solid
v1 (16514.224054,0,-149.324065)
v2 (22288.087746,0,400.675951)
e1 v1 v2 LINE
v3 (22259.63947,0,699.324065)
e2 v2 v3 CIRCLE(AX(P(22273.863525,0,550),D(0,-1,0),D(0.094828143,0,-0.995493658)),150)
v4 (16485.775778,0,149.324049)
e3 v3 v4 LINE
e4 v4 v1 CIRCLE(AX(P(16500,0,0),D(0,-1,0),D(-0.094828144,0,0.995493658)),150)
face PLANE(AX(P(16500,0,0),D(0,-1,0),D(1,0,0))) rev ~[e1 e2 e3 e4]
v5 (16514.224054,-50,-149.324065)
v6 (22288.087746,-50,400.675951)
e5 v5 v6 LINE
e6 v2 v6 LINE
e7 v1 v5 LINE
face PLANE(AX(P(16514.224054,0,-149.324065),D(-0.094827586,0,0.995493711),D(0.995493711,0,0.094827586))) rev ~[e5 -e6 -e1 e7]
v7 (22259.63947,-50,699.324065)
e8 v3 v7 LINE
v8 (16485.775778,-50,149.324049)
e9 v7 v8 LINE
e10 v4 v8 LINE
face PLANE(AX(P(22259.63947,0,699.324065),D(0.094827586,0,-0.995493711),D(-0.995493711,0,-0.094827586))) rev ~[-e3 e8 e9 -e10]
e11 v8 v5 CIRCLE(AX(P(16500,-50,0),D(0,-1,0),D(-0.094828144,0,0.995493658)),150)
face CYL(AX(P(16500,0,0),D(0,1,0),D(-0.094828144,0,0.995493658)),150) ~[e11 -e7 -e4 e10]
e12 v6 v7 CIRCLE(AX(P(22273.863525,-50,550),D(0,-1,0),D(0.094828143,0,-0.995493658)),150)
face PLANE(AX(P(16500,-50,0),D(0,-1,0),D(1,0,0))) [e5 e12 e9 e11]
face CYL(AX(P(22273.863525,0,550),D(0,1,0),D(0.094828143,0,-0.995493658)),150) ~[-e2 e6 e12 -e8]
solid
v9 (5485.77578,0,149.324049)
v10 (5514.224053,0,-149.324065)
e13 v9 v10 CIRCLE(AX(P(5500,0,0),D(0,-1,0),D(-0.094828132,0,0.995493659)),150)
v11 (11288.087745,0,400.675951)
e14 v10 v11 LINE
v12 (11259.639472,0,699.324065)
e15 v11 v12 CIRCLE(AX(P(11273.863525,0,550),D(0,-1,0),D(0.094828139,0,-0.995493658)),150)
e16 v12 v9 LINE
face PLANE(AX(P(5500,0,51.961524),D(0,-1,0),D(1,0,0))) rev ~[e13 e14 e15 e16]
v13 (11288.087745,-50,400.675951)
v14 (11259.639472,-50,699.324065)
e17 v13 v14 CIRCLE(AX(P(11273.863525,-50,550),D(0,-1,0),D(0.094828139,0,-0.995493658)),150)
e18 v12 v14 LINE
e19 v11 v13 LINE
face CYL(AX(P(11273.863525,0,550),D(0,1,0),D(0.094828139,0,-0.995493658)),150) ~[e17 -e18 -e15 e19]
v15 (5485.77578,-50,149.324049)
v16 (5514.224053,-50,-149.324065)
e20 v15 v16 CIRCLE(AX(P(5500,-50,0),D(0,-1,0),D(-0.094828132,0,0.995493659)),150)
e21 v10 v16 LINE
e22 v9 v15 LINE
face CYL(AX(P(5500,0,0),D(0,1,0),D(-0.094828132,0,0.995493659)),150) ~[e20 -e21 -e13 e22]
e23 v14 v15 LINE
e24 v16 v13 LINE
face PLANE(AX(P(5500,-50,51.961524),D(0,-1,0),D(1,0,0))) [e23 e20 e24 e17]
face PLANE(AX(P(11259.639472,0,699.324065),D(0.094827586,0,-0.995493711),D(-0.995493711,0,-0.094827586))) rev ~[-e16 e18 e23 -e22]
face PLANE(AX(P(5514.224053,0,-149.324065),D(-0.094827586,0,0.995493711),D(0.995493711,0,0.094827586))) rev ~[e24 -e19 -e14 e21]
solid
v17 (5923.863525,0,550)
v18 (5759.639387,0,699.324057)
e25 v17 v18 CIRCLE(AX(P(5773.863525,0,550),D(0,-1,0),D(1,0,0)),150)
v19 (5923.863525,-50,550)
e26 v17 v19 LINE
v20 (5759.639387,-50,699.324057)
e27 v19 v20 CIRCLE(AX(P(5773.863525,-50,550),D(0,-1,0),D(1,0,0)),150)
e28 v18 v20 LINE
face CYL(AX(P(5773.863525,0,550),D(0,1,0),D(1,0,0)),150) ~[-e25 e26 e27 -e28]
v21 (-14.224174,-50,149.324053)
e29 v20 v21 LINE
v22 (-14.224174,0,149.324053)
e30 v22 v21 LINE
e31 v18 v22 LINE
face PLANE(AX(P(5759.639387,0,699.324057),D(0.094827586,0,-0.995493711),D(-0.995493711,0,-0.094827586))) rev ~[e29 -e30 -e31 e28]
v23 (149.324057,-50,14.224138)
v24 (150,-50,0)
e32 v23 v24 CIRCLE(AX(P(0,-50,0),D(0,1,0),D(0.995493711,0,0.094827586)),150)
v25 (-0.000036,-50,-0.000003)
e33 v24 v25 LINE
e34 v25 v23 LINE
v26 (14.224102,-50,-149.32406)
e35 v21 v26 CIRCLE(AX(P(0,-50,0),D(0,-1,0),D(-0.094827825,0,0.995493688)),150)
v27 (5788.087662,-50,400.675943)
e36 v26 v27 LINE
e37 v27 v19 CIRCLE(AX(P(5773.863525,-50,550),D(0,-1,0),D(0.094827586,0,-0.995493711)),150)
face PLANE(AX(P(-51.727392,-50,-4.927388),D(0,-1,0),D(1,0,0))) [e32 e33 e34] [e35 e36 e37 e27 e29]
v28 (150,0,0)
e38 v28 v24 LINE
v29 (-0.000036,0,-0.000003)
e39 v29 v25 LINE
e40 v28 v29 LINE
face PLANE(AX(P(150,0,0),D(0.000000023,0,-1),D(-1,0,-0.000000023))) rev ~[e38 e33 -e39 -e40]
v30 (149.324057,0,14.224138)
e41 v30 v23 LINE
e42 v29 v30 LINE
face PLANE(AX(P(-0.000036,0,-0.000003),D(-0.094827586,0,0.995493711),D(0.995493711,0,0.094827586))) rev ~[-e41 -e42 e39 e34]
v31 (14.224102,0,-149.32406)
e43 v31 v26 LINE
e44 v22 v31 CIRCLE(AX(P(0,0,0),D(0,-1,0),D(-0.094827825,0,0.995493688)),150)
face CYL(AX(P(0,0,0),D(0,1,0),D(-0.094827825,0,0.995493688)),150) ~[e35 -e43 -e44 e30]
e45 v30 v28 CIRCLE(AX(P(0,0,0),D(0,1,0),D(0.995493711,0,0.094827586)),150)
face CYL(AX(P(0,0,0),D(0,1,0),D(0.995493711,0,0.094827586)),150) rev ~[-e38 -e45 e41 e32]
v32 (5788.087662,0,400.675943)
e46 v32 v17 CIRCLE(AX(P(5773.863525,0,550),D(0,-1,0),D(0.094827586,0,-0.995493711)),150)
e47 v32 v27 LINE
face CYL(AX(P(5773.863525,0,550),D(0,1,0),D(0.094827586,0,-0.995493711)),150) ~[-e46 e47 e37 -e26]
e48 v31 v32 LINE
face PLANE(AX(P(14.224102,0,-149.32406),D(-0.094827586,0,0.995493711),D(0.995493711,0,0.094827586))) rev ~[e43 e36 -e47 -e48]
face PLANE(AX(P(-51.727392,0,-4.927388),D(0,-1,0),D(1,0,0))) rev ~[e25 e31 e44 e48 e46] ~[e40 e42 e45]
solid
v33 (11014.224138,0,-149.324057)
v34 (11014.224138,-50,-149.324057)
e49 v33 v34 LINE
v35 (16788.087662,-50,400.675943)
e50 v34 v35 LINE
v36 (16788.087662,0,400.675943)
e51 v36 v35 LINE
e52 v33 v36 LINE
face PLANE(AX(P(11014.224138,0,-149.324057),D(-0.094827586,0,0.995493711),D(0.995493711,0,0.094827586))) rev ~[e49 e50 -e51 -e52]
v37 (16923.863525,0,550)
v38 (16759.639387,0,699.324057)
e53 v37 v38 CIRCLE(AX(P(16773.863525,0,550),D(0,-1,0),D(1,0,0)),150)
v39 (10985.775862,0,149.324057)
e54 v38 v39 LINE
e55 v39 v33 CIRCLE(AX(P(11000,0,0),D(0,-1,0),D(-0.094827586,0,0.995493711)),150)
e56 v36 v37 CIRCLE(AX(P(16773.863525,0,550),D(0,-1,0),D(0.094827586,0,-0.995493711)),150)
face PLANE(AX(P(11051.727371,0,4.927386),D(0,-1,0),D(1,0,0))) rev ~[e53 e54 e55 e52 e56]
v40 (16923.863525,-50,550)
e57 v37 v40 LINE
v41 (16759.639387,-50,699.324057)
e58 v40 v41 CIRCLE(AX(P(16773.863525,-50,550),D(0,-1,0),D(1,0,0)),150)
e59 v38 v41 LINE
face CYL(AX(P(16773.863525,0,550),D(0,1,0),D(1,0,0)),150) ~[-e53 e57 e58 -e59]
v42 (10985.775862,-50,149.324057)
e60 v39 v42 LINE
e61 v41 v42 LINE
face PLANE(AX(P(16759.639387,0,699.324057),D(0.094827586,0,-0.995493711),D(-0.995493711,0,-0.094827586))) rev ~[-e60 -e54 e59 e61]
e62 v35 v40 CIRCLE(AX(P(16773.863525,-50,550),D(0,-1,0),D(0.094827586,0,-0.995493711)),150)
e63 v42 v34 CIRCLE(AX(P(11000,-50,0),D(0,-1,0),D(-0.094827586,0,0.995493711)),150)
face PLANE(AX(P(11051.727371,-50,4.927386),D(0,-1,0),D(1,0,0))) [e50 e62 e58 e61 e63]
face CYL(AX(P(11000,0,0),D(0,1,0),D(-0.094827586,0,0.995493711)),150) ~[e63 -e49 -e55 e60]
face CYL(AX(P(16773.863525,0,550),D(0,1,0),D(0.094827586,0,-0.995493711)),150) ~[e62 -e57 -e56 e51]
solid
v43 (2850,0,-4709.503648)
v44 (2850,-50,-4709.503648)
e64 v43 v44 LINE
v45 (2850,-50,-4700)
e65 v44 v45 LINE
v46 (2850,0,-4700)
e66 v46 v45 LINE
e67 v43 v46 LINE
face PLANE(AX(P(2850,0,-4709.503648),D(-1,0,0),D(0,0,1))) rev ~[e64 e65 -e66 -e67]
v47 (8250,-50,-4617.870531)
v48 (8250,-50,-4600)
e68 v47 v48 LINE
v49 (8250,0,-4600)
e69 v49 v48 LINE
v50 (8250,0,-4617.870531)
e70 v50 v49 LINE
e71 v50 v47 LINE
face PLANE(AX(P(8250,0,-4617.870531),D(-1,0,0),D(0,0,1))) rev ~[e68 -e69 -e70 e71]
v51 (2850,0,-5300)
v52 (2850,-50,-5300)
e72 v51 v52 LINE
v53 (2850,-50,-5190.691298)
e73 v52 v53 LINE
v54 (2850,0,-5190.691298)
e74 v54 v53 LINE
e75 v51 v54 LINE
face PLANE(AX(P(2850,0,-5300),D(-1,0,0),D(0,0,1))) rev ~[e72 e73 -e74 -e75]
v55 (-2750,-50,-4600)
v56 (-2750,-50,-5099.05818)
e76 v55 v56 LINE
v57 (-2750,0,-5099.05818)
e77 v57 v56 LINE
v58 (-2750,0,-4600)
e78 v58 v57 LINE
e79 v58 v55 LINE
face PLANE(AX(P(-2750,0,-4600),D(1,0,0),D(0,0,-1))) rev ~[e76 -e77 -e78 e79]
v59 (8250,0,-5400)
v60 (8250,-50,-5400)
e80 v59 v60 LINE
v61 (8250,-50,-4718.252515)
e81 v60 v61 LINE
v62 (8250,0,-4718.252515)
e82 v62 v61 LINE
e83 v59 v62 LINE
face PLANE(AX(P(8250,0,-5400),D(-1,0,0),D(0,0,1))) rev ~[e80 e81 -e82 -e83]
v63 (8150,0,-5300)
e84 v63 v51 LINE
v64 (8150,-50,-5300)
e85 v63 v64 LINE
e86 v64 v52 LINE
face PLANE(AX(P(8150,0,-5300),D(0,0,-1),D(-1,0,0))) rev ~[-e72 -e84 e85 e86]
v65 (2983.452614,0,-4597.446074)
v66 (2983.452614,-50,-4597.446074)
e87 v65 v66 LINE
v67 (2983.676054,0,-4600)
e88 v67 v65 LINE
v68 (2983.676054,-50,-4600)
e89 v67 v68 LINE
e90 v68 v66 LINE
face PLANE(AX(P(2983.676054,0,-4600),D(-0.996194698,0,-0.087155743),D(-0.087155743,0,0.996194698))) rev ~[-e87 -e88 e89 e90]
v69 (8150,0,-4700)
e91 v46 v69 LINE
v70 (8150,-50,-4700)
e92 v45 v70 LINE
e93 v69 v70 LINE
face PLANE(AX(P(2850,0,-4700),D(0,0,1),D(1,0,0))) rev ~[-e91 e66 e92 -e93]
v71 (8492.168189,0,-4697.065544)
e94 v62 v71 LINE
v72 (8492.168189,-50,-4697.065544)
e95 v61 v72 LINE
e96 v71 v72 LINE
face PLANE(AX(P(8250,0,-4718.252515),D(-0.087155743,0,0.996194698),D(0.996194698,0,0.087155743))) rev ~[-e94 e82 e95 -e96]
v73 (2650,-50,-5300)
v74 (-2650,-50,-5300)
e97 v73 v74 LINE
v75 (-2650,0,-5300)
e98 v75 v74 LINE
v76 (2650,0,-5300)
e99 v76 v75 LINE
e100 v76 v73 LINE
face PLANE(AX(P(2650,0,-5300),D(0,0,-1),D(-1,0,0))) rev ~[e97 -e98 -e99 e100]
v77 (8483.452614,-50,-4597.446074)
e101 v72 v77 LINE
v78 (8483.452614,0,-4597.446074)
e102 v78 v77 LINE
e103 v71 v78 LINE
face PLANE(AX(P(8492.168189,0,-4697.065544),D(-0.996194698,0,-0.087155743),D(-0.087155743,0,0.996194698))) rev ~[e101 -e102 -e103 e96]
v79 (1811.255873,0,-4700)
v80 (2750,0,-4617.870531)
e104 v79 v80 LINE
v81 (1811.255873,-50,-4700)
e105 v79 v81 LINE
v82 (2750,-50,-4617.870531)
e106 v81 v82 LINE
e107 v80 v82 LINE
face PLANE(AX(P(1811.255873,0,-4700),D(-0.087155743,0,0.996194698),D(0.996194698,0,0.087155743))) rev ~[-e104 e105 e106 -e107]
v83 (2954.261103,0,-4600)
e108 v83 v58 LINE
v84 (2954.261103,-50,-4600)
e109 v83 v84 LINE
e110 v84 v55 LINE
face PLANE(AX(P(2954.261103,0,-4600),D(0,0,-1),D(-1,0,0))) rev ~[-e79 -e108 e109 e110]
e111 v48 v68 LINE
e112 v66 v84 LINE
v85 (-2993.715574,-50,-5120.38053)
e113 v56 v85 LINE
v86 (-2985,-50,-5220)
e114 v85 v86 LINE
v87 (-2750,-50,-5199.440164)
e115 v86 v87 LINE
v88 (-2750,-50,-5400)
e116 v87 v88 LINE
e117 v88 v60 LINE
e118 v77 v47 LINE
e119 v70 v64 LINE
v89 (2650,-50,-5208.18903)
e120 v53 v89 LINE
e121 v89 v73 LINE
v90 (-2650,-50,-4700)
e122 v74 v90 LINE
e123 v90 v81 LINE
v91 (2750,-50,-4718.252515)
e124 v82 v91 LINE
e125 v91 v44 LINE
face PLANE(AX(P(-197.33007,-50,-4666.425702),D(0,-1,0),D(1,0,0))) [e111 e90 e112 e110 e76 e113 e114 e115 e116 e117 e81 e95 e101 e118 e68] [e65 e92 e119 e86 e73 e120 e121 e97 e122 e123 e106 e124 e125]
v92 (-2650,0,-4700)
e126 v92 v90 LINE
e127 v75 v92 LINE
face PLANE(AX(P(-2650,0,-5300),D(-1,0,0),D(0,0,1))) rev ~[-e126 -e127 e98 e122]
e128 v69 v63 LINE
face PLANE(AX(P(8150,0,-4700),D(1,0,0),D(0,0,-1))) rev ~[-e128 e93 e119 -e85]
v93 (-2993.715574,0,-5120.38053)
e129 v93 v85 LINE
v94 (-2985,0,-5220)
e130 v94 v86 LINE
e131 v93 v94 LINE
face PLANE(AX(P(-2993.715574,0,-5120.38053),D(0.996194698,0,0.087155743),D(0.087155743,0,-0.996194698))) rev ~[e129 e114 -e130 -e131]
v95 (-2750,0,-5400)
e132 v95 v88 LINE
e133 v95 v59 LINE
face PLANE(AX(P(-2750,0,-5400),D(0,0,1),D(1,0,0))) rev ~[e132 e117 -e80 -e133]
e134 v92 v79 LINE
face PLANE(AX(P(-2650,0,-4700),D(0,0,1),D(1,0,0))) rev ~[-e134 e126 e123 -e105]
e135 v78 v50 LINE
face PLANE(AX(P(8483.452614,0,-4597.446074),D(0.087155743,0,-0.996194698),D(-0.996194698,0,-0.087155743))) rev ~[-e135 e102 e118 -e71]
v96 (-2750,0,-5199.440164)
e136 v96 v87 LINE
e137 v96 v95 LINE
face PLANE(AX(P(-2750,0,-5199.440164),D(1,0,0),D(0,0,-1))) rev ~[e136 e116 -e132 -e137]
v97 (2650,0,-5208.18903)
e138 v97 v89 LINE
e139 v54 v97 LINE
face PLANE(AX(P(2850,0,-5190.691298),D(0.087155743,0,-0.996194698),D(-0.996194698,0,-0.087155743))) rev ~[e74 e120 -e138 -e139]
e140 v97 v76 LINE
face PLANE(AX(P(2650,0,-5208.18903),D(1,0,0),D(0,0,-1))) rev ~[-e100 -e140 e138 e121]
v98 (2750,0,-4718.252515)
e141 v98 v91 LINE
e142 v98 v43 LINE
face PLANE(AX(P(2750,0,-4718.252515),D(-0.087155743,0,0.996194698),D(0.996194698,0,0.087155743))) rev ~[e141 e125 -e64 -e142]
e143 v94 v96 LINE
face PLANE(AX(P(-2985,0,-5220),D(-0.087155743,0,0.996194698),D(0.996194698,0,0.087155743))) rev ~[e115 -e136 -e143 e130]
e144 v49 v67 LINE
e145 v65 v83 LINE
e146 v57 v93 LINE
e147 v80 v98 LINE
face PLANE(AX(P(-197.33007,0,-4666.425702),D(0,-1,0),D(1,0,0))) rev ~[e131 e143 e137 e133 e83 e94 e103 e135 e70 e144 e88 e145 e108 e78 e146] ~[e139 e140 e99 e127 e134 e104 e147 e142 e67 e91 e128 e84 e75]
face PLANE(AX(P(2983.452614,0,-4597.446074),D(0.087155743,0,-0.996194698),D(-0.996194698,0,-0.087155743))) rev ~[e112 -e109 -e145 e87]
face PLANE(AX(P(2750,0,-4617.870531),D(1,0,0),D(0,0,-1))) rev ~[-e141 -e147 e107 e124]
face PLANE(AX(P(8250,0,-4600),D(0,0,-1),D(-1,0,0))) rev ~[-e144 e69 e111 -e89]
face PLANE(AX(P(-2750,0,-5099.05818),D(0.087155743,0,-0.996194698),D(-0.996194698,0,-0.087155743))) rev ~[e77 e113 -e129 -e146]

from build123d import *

# Parameters (mm, degrees)
F1_DEPTH = 50


# Not quite as in the source:
# - ends of sketch curves that miss each other by under 0.0002 mm in the source are joined


with BuildPart() as f1:
    # F0 (on Front) → F1 (new body)
    with BuildSketch(Plane.XZ):
        with BuildLine():
            Line((-3.5807e-05, -3.4109e-06), (-14.224173738, 149.3240532582))
            ThreePointArc((-14.224173738, 149.3240532582), (-149.3240566691, -14.224137931), (14.224102124, -149.32406008))
            Line((14.224102124, -149.32406008), (-3.5807e-05, -3.4109e-06))
        make_face()
        with BuildLine():
            Line((5759.6393866078, 699.3240566691), (-14.224173738, 149.3240532582))
            ThreePointArc((-14.224173738, 149.3240532582), (95.5300548118, 115.6460489063), (149.3240566691, 14.224137931))
            Line((149.3240566691, 14.224137931), (5624.5394678697, 535.775862069))
            ThreePointArc((5624.5394678697, 535.775862069), (5658.2174870863, 645.5300686774), (5759.6393866078, 699.3240566691))
        make_face()
        with BuildLine():
            ThreePointArc((149.3240566691, 14.224137931), (95.5300548118, 115.6460489063), (-14.224173738, 149.3240532582))
            Line((-14.224173738, 149.3240532582), (-3.5807e-05, -3.4109e-06))
            Line((-3.5807e-05, -3.4109e-06), (149.3240566691, 14.224137931))
        make_face()
        with BuildLine():
            Line((-3.5807e-05, -3.4109e-06), (14.224102124, -149.32406008))
            ThreePointArc((14.224102124, -149.32406008), (110.9811139758, -100.9118047639), (150, 0))
            Line((150, 0), (-3.5807e-05, -3.4109e-06))
        make_face()
        with BuildLine():
            ThreePointArc((150, 0), (110.9811139758, -100.9118047639), (14.224102124, -149.32406008))
            Line((14.224102124, -149.32406008), (1581.818181818, 0))
            Line((1581.818181818, 0), (150, 0))
        make_face()
        with BuildLine():
            Line((5624.5394678697, 535.775862069), (149.3240566691, 14.224137931))
            ThreePointArc((149.3240566691, 14.224137931), (149.8309188725, 7.1200947899), (150, 0))
            Line((150, 0), (1581.818181818, 0))
            Line((1581.818181818, 0), (5788.0876624699, 400.6759433309))
            ThreePointArc((5788.0876624699, 400.6759433309), (5678.3334558614, 434.3539625474), (5624.5394678697, 535.775862069))
        make_face()
        with BuildLine():
            Line((5773.8635245388, 550), (5759.6393866078, 699.3240566691))
            ThreePointArc((5759.6393866078, 699.3240566691), (5658.2174870863, 645.5300686774), (5624.5394678697, 535.775862069))
            Line((5624.5394678697, 535.775862069), (5773.8635245388, 550))
        make_face()
        with BuildLine():
            ThreePointArc((5923.8635245388, 550), (5874.7753159964, 660.9811260748), (5759.6393866078, 699.3240566691))
            Line((5759.6393866078, 699.3240566691), (5773.8635245388, 550))
            Line((5773.8635245388, 550), (5788.0876624699, 400.6759433309))
            ThreePointArc((5788.0876624699, 400.6759433309), (5884.8446506136, 449.0882085424), (5923.8635245388, 550))
        make_face()
        with BuildLine():
            Line((5773.8635245388, 550), (5624.5394678697, 535.775862069))
            ThreePointArc((5624.5394678697, 535.775862069), (5678.3334558614, 434.3539625474), (5788.0876624699, 400.6759433309))
            Line((5788.0876624699, 400.6759433309), (5773.8635245388, 550))
        make_face()
    extrude(amount=F1_DEPTH)


with BuildPart() as f1b:
    # F0 (on Front) → F1, piece 2 (new body)
    with BuildSketch(Plane.XZ):
        with BuildLine():
            ThreePointArc((5485.7757801252, 149.3240488634), (5389.0188462368, 100.9117610063), (5350, 0))
            Line((5350, 0), (5650, 0))
            ThreePointArc((5650, 0), (5600.9117610063, 110.9811537632), (5485.7757801252, 149.3240488634))
        make_face()
        with BuildLine():
            Line((5650, 0), (5350, 0))
            ThreePointArc((5350, 0), (5399.0881771331, -110.9810975152), (5514.224053409, -149.3240647204))
            ThreePointArc((5514.224053409, -149.3240647204), (5610.9810975152, -100.9118228669), (5650, 0))
        make_face()
        with BuildLine():
            Line((11259.6394721102, 699.3240648138), (5485.7757801252, 149.3240488634))
            ThreePointArc((5485.7757801252, 149.3240488634), (5600.9117610063, 110.9811537632), (5650, 0))
            ThreePointArc((5650, 0), (5610.9810975152, -100.9118228669), (5514.224053409, -149.3240647204))
            Line((5514.224053409, -149.3240647204), (11288.087745394, 400.67595123))
            ThreePointArc((11288.087745394, 400.67595123), (11124.5394677469, 535.7758633581), (11259.6394721102, 699.3240648138))
        make_face()
        with BuildLine():
            ThreePointArc((11423.8635245388, 550), (11374.7753477701, 660.9810971839), (11259.6394721102, 699.3240648138))
            ThreePointArc((11259.6394721102, 699.3240648138), (11124.5394677469, 535.7758633581), (11288.087745394, 400.67595123))
            ThreePointArc((11288.087745394, 400.67595123), (11384.8446786333, 449.088239358), (11423.8635245388, 550))
        make_face()
    extrude(amount=F1_DEPTH)


with BuildPart() as f1c:
    # F0 (on Front) → F1, piece 3 (new body)
    with BuildSketch(Plane.XZ):
        with BuildLine():
            ThreePointArc((11014.224137931, -149.3240566691), (11110.9811260748, -100.9117914576), (11150, 0))
            ThreePointArc((11150, 0), (11100.9117914575, 110.9811260748), (10985.775862069, 149.3240566691))
            Line((10985.775862069, 149.3240566691), (11014.224137931, -149.3240566691))
        make_face()
        with BuildLine():
            ThreePointArc((10985.775862069, 149.3240566691), (11100.9117914575, 110.9811260748), (11150, 0))
            ThreePointArc((11150, 0), (11110.9811260748, -100.9117914576), (11014.224137931, -149.3240566691))
            Line((11014.224137931, -149.3240566691), (16788.0876624699, 400.6759433309))
            ThreePointArc((16788.0876624699, 400.6759433309), (16624.5394678697, 535.775862069), (16759.6393866078, 699.3240566691))
            Line((16759.6393866078, 699.3240566691), (10985.775862069, 149.3240566691))
        make_face()
        with BuildLine():
            Line((11014.224137931, -149.3240566691), (10985.775862069, 149.3240566691))
            ThreePointArc((10985.775862069, 149.3240566691), (10850.6759433309, -14.224137931), (11014.224137931, -149.3240566691))
        make_face()
        with BuildLine():
            Line((16788.0876624699, 400.6759433309), (16759.6393866078, 699.3240566691))
            ThreePointArc((16759.6393866078, 699.3240566691), (16624.5394678697, 535.775862069), (16788.0876624699, 400.6759433309))
        make_face()
        with BuildLine():
            ThreePointArc((16923.8635245388, 550), (16874.7753159964, 660.9811260748), (16759.6393866078, 699.3240566691))
            Line((16759.6393866078, 699.3240566691), (16788.0876624699, 400.6759433309))
            ThreePointArc((16788.0876624699, 400.6759433309), (16884.8446506136, 449.0882085424), (16923.8635245388, 550))
        make_face()
    extrude(amount=F1_DEPTH)


with BuildPart() as f1d:
    # F0 (on Front) → F1, piece 4 (new body)
    with BuildSketch(Plane.XZ):
        with BuildLine():
            ThreePointArc((16514.2240542685, -149.3240646385), (16610.9810978056, -100.9118225475), (16650, 0))
            ThreePointArc((16650, 0), (16600.9117603676, 110.9811543439), (16485.7757784065, 149.3240486997))
            ThreePointArc((16485.7757784065, 149.3240486997), (16350.6759433309, -14.224137931), (16514.2240542685, -149.3240646385))
        make_face()
        with BuildLine():
            ThreePointArc((16485.7757784065, 149.3240486997), (16600.9117603676, 110.9811543439), (16650, 0))
            ThreePointArc((16650, 0), (16610.9810978056, -100.9118225475), (16514.2240542685, -149.3240646385))
            Line((16514.2240542685, -149.3240646385), (22288.0877459291, 400.6759512809))
            ThreePointArc((22288.0877459291, 400.675951281), (22124.5394678697, 535.775862069), (22259.639470067, 699.3240646191))
            Line((22259.639470067, 699.3240646192), (16485.7757784065, 149.3240486997))
        make_face()
        with BuildLine():
            ThreePointArc((22423.8635245388, 550), (22374.7753470108, 660.9810978743), (22259.639470067, 699.3240646191))
            ThreePointArc((22259.639470067, 699.3240646191), (22124.5394678697, 535.775862069), (22288.0877459291, 400.675951281))
            ThreePointArc((22288.0877459291, 400.675951281), (22384.8446788141, 449.0882395569), (22423.8635245388, 550))
        make_face()
    extrude(amount=F1_DEPTH)


with BuildPart() as f1e:
    # F0 (on Front) → F1, piece 5 (new body)
    with BuildSketch(Plane.XZ):
        Polygon((2750, -4617.8705309245), (2750, -4600), (-2750, -4600), (-2750, -5099.0581803171), (-2650, -5090.3093139645), (-2650, -4700), (1811.2558728689, -4700), align=None)
        Polygon((2954.2611031453, -4600), (2750, -4600), (2750, -4617.8705309245), align=None)
        Polygon((2954.2611031453, -4600), (2750, -4617.8705309245), (2750, -4718.2525146788), (2850, -4709.5036483262), (2850, -4700), (2958.6271974359, -4700), (2992.1681885505, -4697.065543514), (2983.676053874, -4600), align=None)
        Polygon((2983.4526142757, -4597.4460737049), (2954.2611031453, -4600), (2983.676053874, -4600), align=None)
        Polygon((-2650, -5090.3093139645), (-2750, -5099.0581803171), (-2750, -5199.4401640714), (-2650, -5190.6912977188), align=None)
        Polygon((-2750, -5199.4401640714), (-2750, -5099.0581803171), (-2993.7155742748, -5120.3805301908), (-2985, -5220), align=None)
        Polygon((8250, -4600), (2983.676053874, -4600), (2992.1681885505, -4697.065543514), (2958.6271974359, -4700), (7311.2558728688, -4700), (8250, -4617.8705309245), align=None)
        Polygon((-2650, -5190.6912977188), (-2750, -5199.4401640714), (-2750, -5400), (2750, -5400), (2750, -5199.4401640714), (2650, -5208.189030424), (2650, -5300), (-2650, -5300), align=None)
        Polygon((2850, -5190.6912977188), (2750, -5199.4401640714), (2750, -5400), (8250, -5400), (8250, -4718.2525146788), (8150, -4727.0013810314), (8150, -5300), (2850, -5300), align=None)
        Polygon((8483.4526142757, -4597.4460737049), (8250, -4617.8705309245), (8250, -4718.2525146788), (8492.1681885505, -4697.065543514), align=None)
        Polygon((8250, -4718.2525146788), (8250, -4617.8705309245), (7311.2558728688, -4700), (8150, -4700), (8150, -4727.0013810314), align=None)
    extrude(amount=F1_DEPTH)


solid = Compound([f1.part, f1b.part, f1c.part, f1d.part, f1e.part])
